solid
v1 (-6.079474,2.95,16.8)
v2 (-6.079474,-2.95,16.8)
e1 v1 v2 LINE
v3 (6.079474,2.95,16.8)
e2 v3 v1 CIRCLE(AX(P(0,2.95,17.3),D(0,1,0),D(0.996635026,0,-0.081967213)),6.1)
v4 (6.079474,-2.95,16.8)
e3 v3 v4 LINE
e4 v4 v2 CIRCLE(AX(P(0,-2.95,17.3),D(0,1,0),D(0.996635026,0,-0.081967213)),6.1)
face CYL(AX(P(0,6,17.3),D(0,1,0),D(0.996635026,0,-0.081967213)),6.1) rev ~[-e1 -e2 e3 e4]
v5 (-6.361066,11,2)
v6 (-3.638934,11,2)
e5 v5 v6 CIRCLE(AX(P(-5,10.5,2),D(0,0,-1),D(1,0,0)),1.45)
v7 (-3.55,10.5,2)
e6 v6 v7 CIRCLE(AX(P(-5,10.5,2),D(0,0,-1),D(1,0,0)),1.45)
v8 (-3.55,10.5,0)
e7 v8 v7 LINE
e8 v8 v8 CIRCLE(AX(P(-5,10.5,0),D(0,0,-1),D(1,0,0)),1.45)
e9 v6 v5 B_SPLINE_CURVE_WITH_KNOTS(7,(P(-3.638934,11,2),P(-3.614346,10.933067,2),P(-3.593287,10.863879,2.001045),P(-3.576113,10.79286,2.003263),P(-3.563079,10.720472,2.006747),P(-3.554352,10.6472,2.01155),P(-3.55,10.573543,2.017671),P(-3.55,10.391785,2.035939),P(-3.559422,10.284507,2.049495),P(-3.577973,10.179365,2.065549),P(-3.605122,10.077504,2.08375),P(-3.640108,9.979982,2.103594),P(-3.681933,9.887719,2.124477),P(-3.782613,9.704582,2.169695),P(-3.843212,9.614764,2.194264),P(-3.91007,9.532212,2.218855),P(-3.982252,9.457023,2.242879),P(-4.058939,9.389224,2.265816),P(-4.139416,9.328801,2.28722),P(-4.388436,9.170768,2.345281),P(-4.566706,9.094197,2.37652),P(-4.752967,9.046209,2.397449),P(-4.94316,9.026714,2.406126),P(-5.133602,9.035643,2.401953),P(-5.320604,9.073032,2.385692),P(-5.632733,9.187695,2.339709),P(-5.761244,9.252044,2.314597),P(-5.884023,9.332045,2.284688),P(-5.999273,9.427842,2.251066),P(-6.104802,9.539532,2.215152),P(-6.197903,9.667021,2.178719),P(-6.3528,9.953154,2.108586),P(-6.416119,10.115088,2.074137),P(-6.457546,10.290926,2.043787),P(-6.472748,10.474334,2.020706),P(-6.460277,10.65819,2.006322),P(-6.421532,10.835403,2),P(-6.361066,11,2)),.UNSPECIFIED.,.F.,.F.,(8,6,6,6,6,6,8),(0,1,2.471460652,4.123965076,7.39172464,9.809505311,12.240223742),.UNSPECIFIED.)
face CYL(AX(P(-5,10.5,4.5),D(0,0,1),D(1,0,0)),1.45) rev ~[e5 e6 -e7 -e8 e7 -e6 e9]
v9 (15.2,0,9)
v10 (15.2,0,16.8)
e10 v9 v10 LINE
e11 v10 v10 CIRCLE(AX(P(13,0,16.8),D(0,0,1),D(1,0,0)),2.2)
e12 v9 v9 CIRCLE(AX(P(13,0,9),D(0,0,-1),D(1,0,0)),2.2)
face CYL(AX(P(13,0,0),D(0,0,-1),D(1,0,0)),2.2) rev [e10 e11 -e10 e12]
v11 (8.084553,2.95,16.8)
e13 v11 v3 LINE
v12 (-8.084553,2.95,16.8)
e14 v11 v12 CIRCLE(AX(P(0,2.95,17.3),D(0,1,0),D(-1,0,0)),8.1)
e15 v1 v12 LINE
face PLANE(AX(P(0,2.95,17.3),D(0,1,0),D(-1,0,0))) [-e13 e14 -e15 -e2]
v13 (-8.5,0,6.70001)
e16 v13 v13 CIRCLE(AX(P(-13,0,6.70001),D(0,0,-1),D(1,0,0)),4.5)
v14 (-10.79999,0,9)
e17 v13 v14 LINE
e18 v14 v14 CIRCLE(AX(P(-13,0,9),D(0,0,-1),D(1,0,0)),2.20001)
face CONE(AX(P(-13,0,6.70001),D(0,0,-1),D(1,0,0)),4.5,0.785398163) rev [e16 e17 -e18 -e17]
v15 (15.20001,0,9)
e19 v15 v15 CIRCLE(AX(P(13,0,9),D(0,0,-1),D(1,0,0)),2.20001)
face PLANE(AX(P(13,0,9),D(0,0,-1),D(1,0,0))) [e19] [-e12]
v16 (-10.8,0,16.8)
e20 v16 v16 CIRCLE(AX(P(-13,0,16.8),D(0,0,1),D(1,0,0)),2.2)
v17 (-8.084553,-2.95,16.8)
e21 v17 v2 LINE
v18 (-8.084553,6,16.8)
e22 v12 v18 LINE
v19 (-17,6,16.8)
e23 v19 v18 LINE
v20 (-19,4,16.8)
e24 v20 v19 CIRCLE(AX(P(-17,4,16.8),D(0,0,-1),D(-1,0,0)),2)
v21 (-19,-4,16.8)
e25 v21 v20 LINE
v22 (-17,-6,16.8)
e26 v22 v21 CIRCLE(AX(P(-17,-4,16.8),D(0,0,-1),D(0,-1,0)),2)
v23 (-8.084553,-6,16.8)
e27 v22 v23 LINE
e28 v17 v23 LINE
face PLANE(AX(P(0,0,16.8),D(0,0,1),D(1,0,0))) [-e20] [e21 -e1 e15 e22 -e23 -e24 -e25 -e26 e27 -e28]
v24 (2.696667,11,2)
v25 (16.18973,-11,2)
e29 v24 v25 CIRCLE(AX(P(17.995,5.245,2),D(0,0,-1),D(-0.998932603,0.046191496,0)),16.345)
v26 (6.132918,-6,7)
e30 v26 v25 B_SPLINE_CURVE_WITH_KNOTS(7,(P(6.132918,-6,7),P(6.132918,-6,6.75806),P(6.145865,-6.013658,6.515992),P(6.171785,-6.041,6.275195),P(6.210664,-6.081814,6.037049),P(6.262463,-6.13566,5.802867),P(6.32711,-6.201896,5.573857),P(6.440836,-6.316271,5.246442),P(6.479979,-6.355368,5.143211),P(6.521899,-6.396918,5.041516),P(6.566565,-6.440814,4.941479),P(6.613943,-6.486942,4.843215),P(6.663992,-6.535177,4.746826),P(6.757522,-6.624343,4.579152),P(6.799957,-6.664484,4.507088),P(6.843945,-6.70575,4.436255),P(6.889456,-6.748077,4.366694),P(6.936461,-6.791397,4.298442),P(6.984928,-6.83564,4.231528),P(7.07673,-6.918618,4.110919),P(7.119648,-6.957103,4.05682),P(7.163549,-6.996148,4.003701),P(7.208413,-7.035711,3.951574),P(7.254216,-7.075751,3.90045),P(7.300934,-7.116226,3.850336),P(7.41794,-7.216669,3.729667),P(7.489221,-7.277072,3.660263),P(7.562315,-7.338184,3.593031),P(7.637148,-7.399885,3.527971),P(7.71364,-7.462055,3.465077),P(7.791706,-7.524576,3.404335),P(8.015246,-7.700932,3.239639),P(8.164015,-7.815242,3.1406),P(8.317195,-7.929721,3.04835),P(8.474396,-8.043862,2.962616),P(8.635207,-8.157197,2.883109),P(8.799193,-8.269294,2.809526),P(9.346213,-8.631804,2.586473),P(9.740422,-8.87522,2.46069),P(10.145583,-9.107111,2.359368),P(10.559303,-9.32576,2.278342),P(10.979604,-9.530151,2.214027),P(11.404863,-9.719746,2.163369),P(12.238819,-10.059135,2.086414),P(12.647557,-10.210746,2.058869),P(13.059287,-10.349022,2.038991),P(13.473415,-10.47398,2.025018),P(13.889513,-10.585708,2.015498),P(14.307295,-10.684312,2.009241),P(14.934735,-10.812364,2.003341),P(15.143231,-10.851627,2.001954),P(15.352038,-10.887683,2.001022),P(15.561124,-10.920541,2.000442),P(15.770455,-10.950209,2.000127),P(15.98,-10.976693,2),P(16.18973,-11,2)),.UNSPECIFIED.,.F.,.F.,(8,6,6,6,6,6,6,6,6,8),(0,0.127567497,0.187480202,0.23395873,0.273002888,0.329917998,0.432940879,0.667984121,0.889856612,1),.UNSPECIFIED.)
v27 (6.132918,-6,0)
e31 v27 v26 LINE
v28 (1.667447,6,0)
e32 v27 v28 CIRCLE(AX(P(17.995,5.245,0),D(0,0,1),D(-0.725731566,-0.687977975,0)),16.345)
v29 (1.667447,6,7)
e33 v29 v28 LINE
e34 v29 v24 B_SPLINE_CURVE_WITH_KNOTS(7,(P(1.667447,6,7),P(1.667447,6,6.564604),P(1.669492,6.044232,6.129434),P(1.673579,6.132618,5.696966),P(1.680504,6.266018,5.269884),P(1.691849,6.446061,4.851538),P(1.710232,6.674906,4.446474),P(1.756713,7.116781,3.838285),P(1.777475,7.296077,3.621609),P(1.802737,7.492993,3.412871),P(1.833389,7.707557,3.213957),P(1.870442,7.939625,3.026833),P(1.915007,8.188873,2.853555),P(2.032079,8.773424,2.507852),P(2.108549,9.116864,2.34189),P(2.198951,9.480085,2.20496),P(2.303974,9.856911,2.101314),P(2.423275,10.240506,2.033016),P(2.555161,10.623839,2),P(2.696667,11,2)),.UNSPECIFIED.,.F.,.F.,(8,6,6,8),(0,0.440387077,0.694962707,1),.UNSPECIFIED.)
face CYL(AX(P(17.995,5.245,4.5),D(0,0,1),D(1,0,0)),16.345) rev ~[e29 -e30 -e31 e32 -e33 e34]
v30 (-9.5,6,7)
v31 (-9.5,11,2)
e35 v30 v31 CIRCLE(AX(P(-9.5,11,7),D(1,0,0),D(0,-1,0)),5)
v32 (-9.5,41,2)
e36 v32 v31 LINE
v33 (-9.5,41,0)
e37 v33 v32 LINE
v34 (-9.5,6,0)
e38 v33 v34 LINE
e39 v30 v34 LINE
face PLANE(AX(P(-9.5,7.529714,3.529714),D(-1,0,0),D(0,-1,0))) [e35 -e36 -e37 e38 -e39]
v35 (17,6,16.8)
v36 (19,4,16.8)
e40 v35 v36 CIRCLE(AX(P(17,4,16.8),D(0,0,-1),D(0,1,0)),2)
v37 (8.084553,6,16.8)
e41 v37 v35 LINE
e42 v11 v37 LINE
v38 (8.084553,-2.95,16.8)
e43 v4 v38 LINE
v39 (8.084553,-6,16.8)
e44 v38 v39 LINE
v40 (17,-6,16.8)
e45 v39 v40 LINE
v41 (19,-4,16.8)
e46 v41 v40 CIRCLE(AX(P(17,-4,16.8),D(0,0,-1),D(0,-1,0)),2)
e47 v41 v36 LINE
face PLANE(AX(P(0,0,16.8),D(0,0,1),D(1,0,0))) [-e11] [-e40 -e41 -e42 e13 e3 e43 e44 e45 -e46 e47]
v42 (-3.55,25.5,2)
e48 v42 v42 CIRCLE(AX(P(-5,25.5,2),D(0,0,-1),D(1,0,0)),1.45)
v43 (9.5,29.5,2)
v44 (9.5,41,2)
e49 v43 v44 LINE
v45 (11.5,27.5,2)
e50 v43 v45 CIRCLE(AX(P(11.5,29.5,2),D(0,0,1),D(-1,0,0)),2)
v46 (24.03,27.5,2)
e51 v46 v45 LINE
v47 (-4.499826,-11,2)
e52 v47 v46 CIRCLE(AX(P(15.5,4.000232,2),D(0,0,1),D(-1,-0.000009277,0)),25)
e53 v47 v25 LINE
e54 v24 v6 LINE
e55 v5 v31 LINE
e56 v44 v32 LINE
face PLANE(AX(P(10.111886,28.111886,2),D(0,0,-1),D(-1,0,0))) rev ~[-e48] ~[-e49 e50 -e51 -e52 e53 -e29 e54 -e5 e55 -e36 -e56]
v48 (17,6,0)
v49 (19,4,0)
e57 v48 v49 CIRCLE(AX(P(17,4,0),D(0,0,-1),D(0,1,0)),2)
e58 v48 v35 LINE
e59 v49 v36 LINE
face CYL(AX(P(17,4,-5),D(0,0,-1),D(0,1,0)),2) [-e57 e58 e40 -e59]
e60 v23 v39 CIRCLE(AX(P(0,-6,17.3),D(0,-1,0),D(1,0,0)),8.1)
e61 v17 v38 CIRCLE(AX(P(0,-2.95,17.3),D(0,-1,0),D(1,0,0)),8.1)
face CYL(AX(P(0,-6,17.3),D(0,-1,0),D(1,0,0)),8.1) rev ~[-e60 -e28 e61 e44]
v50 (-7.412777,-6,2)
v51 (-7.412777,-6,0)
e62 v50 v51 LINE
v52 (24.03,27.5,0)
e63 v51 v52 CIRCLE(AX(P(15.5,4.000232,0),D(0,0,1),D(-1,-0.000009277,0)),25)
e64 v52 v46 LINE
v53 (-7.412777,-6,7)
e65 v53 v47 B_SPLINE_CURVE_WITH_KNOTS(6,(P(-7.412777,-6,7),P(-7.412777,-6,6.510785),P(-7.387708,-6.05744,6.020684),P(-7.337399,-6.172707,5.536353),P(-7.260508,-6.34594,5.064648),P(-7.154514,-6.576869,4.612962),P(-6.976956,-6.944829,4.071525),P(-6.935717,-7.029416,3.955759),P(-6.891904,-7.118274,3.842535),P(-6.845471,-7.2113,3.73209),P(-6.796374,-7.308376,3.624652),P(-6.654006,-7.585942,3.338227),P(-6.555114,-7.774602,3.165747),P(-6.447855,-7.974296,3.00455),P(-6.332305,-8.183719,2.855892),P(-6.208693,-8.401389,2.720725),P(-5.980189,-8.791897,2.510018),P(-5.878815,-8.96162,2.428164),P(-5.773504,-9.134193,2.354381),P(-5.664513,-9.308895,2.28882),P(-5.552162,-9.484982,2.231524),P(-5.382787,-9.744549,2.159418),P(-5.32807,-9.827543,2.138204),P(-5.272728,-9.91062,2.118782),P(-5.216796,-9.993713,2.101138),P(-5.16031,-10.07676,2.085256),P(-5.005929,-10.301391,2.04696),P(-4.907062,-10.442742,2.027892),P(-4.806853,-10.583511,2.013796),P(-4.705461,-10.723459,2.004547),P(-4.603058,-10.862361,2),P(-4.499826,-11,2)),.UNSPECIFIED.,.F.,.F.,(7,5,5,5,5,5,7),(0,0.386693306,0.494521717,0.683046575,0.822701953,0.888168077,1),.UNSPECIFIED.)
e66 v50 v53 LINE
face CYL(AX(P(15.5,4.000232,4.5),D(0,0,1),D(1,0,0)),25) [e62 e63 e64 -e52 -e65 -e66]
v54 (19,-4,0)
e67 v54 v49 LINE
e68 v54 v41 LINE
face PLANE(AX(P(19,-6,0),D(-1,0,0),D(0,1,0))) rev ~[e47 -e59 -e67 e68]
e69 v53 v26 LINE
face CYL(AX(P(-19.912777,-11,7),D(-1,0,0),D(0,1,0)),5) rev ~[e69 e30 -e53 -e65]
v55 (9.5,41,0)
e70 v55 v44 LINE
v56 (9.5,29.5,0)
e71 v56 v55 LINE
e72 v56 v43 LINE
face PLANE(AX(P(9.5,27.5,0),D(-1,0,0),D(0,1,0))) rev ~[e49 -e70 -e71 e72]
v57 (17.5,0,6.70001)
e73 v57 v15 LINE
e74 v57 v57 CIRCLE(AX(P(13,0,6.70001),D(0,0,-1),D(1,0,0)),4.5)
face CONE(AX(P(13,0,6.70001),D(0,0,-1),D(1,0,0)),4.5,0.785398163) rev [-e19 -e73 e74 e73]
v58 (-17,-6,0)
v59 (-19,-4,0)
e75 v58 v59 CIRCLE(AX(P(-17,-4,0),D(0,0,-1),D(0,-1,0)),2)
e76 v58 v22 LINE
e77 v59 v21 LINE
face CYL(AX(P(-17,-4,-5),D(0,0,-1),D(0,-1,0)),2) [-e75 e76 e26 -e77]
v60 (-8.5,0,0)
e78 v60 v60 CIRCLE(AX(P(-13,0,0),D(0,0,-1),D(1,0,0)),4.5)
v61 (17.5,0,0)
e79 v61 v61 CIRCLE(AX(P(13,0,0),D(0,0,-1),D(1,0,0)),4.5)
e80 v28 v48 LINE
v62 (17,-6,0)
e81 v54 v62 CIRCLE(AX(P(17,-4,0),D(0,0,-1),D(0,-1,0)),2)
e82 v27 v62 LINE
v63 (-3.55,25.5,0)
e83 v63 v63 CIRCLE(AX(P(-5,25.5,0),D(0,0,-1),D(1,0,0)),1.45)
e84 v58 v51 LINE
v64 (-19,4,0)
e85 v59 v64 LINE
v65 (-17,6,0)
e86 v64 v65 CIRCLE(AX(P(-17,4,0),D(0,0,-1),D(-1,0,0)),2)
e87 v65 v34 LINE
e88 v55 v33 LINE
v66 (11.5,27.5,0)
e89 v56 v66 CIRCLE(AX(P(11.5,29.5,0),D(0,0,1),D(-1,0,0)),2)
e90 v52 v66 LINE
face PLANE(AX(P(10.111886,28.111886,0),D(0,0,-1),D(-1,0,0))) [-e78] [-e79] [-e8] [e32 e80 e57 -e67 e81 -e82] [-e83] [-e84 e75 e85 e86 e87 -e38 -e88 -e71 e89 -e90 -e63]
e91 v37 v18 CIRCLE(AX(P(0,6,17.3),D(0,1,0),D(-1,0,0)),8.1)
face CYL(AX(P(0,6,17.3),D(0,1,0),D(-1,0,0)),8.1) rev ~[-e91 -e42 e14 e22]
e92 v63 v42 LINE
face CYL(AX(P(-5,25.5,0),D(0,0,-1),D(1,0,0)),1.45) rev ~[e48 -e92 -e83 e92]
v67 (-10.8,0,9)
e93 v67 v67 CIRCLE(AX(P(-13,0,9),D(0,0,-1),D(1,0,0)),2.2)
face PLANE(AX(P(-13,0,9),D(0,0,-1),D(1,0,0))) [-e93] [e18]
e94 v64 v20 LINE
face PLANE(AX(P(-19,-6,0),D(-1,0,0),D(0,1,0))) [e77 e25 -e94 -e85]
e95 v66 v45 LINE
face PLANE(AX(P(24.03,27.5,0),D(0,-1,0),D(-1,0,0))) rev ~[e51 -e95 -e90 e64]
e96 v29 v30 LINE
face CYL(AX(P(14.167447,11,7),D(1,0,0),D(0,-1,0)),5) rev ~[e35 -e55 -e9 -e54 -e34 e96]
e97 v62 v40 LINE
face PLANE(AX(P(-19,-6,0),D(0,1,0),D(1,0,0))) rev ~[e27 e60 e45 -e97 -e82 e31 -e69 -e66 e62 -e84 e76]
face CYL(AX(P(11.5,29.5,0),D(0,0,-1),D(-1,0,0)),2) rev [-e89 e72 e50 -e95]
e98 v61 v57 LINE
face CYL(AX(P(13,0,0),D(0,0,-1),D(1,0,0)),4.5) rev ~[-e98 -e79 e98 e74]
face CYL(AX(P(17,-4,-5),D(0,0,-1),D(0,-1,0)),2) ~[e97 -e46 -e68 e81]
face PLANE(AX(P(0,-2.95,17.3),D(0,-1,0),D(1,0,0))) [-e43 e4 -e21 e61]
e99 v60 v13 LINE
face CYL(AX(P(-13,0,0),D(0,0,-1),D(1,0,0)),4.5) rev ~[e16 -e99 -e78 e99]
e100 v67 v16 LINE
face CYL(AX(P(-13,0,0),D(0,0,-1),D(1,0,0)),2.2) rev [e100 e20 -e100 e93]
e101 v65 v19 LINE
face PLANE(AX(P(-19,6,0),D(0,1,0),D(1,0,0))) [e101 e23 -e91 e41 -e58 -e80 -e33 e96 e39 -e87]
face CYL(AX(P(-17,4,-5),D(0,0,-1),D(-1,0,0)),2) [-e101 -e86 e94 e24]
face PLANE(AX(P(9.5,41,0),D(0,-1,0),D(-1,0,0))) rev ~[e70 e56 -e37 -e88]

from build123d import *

# Parameters (mm, degrees)
F0_W          = 38
F0_H          = 12
F0_R          = 2.2
F1_DEPTH      = 16.8
F3_DEPTH      = 12.001
F4_R          = 8.1
F5_DEPTH      = 3.05
F6_R          = 8.1
F7_DEPTH      = 3.05
F8_R          = 16.345
F9_DEPTH      = 2
F10_R         = 1.45
F11_DEPTH     = 16.801
F12_R         = 4.5
F12_R_2       = 2.2
F13_DEPTH     = 9
F14_SIZE      = 2.29999
F15_T4_DEPTH  = 23.6674466009
F15_S5_R      = 16.345
F15_T6_DEPTH  = 14
F15_S7_R      = 1.45
F15_T8_DEPTH  = 14
F15_T12_DEPTH = 38.54569481
F15_S13_R     = 25
F15_T14_DEPTH = 21
F15_S15_R     = 16.345
F15_T16_DEPTH = 21
F16_T1_DEPTH  = 2
F16_T3_DEPTH  = 26.8


# Not quite as in the source:
# - a fillet or chamfer that OpenCascade refuses, or shapes differently, is made with other operations: its cross-section is extruded or revolved along the edge and cut away or added
# - a fillet or chamfer is up to 0.001 mm smaller than in the source, because OpenCascade refuses the exact size


with BuildPart() as f1:
    # F0 (on Top) → F1 (new body)
    with BuildSketch(Plane.XY):
        Rectangle(F0_W, F0_H)
        with Locations((-13, 0)):
            Circle(F0_R, mode=Mode.SUBTRACT)
        with Locations((13, 0)):
            Circle(F0_R, mode=Mode.SUBTRACT)
    extrude(amount=F1_DEPTH)

    # F2 (on face) → F3 (cut, through all)
    with BuildSketch(Plane(origin=(0, 6, 0), x_dir=(-1, 0, 0), z_dir=(0, 1, 0))):
        with BuildLine():
            ThreePointArc((-6.0794736614, 16.8), (0, 11.2), (6.0794736614, 16.8))
            Line((6.0794736614, 16.8), (-6.0794736614, 16.8))
        make_face()
        with BuildLine():
            Line((-6.0794736614, 16.8), (6.0794736614, 16.8))
            ThreePointArc((6.0794736614, 16.8), (6.0948662551, 17.0497894234), (6.1, 17.3))
            ThreePointArc((6.1, 17.3), (-0.2502105766, 23.3948662551), (-6.0794736614, 16.8))
        make_face()
    extrude(amount=-F3_DEPTH, mode=Mode.SUBTRACT)

    # F4 (on face) → F5 (cut)
    with BuildSketch(Plane(origin=(0, 6, 0), x_dir=(-1, 0, 0), z_dir=(0, 1, 0))):
        with Locations((0, 17.3)):
            Circle(F4_R)
    extrude(amount=-F5_DEPTH, mode=Mode.SUBTRACT)

    # F6 (on face) → F7 (cut)
    with BuildSketch(Plane.XZ.offset(6)):
        with Locations((0, 17.3)):
            Circle(F6_R)
    extrude(amount=-F7_DEPTH, mode=Mode.SUBTRACT)

    # F8 (on Top) → F9 (join)
    with BuildSketch(Plane.XY):
        with BuildLine():
            Line((-9.5, 41), (-9.5, 4))
            ThreePointArc((-9.5, 4), (29.848439809, -16.4722441189), (24.03, 27.5))
            Line((24.03, 27.5), (9.5, 27.5))
            Line((9.5, 27.5), (9.5, 41))
            Line((9.5, 41), (-9.5, 41))
        make_face()
        with Locations((17.995, 5.245)):
            Circle(F8_R, mode=Mode.SUBTRACT)
    extrude(amount=F9_DEPTH)

    # F10 (on face) → F11 (cut, through all)
    with BuildSketch(Plane(origin=(0, 0, 0), x_dir=(1, 0, 0), z_dir=(0, 0, -1))):
        with Locations((-5, -10.5)):
            Circle(F10_R)
        with Locations((-5, -25.5)):
            Circle(F10_R)
    extrude(amount=-F11_DEPTH, mode=Mode.SUBTRACT)

    # F12 (on face) → F13 (cut)
    with BuildSketch(Plane(origin=(0, 0, 0), x_dir=(1, 0, 0), z_dir=(0, 0, -1))):
        with Locations((-13, 0)):
            Circle(F12_R)
        with Locations((-13, 0)):
            Circle(F12_R_2, mode=Mode.SUBTRACT)
        with Locations((13, 0)):
            Circle(F12_R)
        with Locations((13, 0)):
            Circle(F12_R_2, mode=Mode.SUBTRACT)
    extrude(amount=-F13_DEPTH, mode=Mode.SUBTRACT)

    # F14 (size 2.3 in the source; OpenCascade refuses exactly that, so slightly less here)
    f14_edges = [f1.edges().sort_by_distance(p)[0] for p in [
        (-17.5, 0, 9),
        (8.5, 0, 9),
    ]]
    chamfer(f14_edges, length=F14_SIZE)

    # F15: fillet of radius 5 on 2 edges, made by hand


with BuildPart() as f15_tool2:
    # F15_s3 → F15_t4 (new body)
    with BuildSketch(Plane.YZ.offset(14.1674466009)):
        with BuildLine():
            ThreePointArc((6, 7), (7.4644660941, 3.4644660941), (11, 2))
            Line((11, 2), (6, 2))
            Line((6, 2), (6, 7))
        make_face()
    extrude(amount=-F15_T4_DEPTH)

    # F15_s5 → F15_t6 (cut, symmetric)
    with BuildSketch(Plane.XY.offset(4.5)):
        with Locations((17.995, 5.245)):
            Circle(F15_S5_R)
    extrude(amount=F15_T6_DEPTH, both=True, mode=Mode.SUBTRACT)

    # F15_s7 → F15_t8 (cut, symmetric)
    with BuildSketch(Plane.XY.offset(4.5)):
        with Locations((-5, 10.5)):
            Circle(F15_S7_R)
    extrude(amount=F15_T8_DEPTH, both=True, mode=Mode.SUBTRACT)


with BuildPart() as f1_1:
    add(f1.part)

    # F15_t1: union F15_tool2
    add(f15_tool2.part)


with BuildPart() as f15_tool10:
    # F15_s11 → F15_t12 (new body)
    with BuildSketch(Plane.YZ.offset(-19.9127772578)):
        with BuildLine():
            ThreePointArc((-6, 7), (-7.4644660941, 3.4644660941), (-11, 2))
            Line((-11, 2), (-6, 2))
            Line((-6, 2), (-6, 7))
        make_face()
    extrude(amount=F15_T12_DEPTH)

    # F15_s13 → F15_t14 (intersect, symmetric)
    with BuildSketch(Plane.XY.offset(4.5)):
        with Locations((15.4999999989, 4.0002319164)):
            Circle(F15_S13_R)
    extrude(amount=F15_T14_DEPTH, both=True, mode=Mode.INTERSECT)

    # F15_s15 → F15_t16 (cut, symmetric)
    with BuildSketch(Plane.XY.offset(4.5)):
        with Locations((17.995, 5.245)):
            Circle(F15_S15_R)
    extrude(amount=F15_T16_DEPTH, both=True, mode=Mode.SUBTRACT)


with BuildPart() as f1_2:
    add(f1_1.part)

    # F15_t9: union F15_tool10
    add(f15_tool10.part)

    # F16: fillet of radius 2 on 5 edges, made by hand

    # F16_s2 → F16_t1 (join)
    with BuildSketch(Plane.XY):
        with BuildLine():
            ThreePointArc((9.5, 29.5), (10.0857864376, 28.0857864376), (11.5, 27.5))
            Line((11.5, 27.5), (9.5, 27.5))
            Line((9.5, 27.5), (9.5, 29.5))
        make_face()
    extrude(amount=F16_T1_DEPTH)

    # F16_s4 → F16_t3 (cut)
    with BuildSketch(Plane.XY.offset(-5)):
        with BuildLine():
            ThreePointArc((17, 6), (18.4142135624, 5.4142135624), (19, 4))
            Line((19, 4), (19, 6))
            Line((19, 6), (17, 6))
        make_face()
        with BuildLine():
            ThreePointArc((17, -6), (18.4142135624, -5.4142135624), (19, -4))
            Line((19, -4), (19, -6))
            Line((19, -6), (17, -6))
        make_face()
        with BuildLine():
            ThreePointArc((-19, 4), (-18.4142135624, 5.4142135624), (-17, 6))
            Line((-17, 6), (-19, 6))
            Line((-19, 6), (-19, 4))
        make_face()
        with BuildLine():
            ThreePointArc((-17, -6), (-18.4142135624, -5.4142135624), (-19, -4))
            Line((-19, -4), (-19, -6))
            Line((-19, -6), (-17, -6))
        make_face()
    extrude(amount=F16_T3_DEPTH, mode=Mode.SUBTRACT)


solid = f1_2.part
